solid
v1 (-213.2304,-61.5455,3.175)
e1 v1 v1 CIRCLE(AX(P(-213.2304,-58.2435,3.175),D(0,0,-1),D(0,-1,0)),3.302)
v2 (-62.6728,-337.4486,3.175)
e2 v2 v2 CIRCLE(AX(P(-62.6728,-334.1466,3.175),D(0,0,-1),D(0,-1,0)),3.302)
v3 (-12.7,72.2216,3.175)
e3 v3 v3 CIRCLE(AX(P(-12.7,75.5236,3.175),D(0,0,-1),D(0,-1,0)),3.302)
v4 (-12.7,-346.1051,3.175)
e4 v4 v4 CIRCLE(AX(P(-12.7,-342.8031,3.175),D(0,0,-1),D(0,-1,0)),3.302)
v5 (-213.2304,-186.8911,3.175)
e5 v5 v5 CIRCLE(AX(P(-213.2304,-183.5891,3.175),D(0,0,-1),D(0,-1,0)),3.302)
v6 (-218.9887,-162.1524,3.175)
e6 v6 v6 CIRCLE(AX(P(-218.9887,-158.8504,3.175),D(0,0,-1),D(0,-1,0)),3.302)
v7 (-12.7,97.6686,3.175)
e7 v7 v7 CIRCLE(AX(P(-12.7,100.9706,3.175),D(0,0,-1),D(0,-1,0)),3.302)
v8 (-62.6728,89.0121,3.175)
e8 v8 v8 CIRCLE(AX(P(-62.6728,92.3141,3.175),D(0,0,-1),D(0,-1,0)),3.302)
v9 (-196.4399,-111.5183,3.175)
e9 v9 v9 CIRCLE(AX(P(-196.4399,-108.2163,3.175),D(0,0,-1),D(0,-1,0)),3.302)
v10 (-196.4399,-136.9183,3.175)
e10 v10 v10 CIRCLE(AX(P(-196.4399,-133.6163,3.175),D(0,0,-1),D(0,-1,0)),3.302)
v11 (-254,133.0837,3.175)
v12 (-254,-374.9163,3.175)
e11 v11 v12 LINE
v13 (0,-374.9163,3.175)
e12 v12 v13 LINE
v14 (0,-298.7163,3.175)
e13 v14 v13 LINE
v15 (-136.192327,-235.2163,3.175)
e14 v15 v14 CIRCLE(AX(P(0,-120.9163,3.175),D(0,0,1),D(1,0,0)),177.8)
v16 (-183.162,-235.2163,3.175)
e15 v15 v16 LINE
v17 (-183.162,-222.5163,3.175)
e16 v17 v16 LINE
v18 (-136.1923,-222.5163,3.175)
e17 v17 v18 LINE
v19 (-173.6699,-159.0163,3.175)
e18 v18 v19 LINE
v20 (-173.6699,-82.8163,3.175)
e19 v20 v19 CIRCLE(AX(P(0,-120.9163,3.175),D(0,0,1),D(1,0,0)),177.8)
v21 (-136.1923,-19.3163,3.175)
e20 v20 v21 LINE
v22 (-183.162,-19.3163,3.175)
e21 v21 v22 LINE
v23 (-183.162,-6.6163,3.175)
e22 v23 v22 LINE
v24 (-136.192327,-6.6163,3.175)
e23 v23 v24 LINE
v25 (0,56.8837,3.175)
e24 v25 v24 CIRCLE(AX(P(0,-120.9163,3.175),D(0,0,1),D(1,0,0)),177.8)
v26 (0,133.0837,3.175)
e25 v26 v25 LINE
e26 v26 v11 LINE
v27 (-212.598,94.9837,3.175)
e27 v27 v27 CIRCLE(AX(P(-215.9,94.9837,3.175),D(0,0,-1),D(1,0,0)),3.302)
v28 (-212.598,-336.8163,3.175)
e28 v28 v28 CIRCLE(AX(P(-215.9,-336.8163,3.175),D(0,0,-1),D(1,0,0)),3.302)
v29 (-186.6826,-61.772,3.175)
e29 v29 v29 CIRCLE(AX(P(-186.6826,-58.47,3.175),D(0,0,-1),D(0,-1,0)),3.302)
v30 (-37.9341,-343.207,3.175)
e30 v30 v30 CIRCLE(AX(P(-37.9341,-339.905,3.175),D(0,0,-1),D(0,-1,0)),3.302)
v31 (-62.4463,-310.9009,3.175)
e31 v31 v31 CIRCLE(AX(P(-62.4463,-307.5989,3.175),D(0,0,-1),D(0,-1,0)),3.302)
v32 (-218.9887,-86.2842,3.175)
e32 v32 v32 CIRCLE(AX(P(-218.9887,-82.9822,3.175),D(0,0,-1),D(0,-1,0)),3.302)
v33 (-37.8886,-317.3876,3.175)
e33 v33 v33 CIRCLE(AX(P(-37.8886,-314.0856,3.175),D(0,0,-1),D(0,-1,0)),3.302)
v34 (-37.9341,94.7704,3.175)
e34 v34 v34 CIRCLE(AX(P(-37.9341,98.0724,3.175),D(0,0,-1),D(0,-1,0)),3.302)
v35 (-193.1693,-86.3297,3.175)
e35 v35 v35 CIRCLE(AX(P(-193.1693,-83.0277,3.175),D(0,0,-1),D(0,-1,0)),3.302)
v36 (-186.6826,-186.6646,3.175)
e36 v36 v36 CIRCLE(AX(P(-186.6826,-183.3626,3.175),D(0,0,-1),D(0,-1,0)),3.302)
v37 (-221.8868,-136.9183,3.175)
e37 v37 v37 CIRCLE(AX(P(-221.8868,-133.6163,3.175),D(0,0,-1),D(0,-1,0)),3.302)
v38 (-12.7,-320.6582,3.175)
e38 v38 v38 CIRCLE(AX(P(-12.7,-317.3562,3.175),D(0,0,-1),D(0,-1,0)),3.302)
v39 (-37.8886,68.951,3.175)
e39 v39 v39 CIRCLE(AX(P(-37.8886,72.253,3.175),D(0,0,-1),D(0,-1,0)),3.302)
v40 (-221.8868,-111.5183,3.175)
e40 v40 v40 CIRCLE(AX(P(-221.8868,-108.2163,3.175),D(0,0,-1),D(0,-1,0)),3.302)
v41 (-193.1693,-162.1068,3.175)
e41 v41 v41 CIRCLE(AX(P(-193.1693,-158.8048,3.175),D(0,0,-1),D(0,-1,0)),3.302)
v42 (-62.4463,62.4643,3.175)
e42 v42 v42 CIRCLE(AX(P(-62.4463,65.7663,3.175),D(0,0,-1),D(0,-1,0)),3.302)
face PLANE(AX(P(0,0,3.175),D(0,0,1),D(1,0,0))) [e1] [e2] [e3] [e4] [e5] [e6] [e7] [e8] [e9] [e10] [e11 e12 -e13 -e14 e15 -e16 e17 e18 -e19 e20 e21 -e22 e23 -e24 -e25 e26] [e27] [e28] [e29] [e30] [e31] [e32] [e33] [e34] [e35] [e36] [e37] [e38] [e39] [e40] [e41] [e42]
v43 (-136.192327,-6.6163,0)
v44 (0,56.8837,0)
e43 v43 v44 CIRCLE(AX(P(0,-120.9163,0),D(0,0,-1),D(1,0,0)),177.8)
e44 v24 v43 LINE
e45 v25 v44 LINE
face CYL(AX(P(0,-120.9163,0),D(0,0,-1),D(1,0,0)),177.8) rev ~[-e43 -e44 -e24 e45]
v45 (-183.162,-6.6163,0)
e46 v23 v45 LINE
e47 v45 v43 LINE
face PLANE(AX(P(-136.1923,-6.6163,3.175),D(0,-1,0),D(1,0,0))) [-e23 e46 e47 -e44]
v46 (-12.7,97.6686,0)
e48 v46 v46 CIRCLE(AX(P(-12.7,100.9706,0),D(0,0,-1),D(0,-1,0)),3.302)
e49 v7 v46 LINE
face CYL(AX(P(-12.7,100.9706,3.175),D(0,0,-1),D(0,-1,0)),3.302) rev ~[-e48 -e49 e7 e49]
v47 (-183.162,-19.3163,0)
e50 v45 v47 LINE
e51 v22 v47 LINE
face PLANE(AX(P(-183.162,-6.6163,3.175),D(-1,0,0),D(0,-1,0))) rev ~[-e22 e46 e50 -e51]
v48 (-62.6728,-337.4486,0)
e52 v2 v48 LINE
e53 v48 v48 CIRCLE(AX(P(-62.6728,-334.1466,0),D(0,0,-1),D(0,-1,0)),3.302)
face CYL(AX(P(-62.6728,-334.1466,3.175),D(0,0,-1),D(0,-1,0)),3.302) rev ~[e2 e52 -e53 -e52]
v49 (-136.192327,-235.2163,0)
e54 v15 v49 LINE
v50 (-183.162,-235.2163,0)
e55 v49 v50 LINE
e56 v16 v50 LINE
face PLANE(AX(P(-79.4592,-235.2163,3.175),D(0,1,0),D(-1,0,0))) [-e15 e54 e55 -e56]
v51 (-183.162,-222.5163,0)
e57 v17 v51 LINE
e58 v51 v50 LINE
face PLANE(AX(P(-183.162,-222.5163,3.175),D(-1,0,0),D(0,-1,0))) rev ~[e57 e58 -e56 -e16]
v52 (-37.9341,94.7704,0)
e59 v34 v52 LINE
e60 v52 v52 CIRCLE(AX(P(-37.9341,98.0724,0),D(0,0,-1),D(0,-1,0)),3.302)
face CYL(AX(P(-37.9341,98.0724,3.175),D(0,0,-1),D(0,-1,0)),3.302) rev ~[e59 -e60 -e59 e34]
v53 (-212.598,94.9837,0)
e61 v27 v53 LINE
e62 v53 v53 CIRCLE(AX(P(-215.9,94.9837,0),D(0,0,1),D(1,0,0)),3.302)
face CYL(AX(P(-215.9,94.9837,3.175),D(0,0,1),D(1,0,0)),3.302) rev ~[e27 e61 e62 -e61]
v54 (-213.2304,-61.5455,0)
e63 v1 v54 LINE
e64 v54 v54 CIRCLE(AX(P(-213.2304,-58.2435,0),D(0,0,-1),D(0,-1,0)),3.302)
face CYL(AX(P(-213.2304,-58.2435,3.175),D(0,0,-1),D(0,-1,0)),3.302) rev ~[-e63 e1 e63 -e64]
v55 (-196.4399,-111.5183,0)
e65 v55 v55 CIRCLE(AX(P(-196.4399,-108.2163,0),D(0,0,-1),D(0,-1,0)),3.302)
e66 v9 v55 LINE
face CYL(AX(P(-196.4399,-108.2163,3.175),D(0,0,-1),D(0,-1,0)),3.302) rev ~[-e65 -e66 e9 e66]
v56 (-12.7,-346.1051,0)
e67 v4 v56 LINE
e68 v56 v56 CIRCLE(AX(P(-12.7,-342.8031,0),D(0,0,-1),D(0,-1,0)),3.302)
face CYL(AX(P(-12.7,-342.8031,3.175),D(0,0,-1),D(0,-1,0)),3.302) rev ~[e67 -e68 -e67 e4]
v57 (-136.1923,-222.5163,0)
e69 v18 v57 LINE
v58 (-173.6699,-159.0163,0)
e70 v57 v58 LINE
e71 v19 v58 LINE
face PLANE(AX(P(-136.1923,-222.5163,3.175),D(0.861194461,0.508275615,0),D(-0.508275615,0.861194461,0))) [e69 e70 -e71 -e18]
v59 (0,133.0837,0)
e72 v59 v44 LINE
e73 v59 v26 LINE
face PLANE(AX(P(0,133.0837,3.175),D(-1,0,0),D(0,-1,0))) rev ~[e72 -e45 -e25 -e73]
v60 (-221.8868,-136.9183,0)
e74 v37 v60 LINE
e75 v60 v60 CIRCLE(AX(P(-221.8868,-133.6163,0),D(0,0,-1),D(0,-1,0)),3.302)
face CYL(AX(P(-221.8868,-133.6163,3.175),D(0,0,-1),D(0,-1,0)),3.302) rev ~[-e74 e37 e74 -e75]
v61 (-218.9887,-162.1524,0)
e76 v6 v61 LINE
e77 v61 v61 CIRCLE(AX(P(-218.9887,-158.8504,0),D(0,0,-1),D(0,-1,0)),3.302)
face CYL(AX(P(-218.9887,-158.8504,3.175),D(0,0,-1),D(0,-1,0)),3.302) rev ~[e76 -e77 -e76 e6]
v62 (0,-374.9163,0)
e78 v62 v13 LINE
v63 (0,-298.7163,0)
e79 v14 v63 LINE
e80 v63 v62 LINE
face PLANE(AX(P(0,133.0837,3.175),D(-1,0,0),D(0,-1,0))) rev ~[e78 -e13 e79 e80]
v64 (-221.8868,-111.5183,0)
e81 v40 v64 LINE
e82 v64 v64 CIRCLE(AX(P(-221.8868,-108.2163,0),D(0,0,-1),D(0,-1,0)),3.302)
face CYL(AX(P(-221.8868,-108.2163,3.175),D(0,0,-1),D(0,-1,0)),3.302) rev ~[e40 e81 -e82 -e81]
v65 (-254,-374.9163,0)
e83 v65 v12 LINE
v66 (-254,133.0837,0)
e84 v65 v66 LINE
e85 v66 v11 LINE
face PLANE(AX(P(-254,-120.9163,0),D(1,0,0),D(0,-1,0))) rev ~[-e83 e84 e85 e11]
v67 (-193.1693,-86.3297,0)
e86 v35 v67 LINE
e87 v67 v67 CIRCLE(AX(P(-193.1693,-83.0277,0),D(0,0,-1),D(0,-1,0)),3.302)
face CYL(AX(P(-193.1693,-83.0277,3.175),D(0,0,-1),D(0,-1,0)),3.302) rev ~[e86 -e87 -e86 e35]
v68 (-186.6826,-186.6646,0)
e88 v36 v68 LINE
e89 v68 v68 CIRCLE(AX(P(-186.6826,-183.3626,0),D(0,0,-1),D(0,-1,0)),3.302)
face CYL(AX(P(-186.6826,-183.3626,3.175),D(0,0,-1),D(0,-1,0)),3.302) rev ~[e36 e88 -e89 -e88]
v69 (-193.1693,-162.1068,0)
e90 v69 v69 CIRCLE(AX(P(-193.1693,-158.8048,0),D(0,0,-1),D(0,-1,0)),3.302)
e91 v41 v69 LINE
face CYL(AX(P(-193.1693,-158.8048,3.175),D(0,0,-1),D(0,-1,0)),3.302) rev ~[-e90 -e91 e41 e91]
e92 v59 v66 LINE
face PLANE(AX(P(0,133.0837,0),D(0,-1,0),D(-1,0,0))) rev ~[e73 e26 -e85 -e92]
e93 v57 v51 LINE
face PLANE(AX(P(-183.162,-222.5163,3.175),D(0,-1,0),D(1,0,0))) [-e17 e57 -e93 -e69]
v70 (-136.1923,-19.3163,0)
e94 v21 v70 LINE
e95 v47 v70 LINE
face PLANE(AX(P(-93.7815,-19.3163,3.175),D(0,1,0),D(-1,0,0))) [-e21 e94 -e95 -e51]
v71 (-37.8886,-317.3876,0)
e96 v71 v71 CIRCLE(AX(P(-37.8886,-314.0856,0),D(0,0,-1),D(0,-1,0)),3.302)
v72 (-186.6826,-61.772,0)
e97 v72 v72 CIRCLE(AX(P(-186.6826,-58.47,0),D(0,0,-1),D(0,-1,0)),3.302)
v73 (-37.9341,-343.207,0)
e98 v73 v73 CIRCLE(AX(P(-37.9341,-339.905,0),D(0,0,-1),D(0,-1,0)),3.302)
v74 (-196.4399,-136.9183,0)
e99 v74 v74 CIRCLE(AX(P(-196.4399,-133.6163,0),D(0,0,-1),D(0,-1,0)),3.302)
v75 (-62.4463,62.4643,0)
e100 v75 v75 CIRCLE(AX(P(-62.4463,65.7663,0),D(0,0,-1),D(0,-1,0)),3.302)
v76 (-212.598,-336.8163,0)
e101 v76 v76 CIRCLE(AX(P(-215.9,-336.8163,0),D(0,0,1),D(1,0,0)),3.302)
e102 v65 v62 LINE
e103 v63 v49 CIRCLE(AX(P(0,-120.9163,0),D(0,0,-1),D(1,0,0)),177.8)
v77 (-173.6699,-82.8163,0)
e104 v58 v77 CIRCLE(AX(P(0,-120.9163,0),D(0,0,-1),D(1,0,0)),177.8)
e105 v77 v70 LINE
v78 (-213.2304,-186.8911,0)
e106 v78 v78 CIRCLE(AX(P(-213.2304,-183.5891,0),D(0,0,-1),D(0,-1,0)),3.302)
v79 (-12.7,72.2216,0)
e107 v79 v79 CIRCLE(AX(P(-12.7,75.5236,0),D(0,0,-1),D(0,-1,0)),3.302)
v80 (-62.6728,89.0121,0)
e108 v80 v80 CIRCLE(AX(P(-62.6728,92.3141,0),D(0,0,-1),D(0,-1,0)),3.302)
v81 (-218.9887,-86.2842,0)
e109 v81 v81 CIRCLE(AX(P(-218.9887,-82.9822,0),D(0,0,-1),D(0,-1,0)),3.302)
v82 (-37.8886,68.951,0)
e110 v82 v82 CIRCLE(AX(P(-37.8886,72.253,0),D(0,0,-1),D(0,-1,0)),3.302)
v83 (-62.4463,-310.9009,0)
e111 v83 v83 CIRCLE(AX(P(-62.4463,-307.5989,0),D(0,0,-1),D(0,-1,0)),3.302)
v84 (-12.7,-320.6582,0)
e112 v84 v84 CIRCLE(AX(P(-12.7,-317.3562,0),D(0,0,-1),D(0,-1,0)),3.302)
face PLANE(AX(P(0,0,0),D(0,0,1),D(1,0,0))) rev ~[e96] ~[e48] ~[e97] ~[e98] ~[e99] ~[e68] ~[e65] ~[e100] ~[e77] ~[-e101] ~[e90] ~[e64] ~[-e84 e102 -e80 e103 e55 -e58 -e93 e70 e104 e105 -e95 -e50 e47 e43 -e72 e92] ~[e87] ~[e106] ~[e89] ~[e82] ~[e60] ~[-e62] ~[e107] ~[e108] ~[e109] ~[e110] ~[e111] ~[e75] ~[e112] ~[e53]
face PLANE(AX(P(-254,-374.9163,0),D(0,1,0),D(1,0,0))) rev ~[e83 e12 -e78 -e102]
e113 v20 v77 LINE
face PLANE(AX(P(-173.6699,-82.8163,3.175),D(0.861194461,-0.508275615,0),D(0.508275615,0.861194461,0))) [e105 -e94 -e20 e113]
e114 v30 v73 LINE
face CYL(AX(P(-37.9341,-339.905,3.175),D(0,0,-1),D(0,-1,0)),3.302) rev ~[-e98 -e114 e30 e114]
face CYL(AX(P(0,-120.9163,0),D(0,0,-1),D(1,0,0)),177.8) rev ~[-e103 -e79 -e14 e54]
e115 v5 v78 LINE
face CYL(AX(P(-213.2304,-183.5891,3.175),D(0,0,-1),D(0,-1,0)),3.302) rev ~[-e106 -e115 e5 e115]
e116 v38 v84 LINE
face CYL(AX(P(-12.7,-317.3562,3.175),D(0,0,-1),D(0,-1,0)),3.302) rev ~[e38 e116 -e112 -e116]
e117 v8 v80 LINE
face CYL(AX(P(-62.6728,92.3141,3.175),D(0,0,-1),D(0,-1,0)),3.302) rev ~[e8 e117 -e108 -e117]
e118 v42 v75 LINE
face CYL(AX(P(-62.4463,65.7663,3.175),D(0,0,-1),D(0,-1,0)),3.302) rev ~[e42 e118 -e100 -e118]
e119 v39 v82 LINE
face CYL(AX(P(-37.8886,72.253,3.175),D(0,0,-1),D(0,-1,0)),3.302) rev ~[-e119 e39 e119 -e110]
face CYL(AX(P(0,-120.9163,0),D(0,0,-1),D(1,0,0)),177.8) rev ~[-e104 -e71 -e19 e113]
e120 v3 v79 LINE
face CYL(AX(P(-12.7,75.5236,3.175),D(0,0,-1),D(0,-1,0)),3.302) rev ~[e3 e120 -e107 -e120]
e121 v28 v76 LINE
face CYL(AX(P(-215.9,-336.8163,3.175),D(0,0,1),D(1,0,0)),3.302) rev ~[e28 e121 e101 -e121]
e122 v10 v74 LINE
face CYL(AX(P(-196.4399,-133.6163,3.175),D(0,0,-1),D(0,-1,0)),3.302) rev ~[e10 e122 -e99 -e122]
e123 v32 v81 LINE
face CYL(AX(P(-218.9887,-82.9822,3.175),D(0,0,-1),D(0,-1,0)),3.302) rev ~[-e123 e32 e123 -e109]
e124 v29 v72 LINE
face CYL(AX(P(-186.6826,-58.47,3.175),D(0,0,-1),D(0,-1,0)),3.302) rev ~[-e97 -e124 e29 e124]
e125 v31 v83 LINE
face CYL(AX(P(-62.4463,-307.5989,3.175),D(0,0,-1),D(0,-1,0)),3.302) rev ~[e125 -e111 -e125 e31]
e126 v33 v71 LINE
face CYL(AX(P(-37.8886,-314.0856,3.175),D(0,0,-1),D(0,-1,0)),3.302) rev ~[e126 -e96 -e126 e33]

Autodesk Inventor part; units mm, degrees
ref_plane "YZ Plane" through (0, 0, 0) normal (1, 0, 0) x (0, 1, 0)
ref_plane "XZ Plane" through (0, 0, 0) normal (0, 1, 0) x (-1, 0, 0)
ref_plane "XY Plane" through (0, 0, 0) normal (0, 0, 1) x (1, 0, 0)
sketch "Sketch1" plane through (0, 0, 0) normal (0, 0, 1) x (1, 0, 0)
  circle A0 centre (62.4463, 65.7663) radius 3.175 projected
  circle A1 centre (37.8886, 72.253) radius 3.175 projected
  circle A2 centre (12.7, 75.5236) radius 3.175 projected
  circle A3 centre (12.7, 100.9706) radius 3.175 projected
  circle A4 centre (37.9341, 98.0724) radius 3.175 projected
  circle A5 centre (62.6728, 92.3141) radius 3.175 projected
  circle A6 centre (-62.6728, 92.3141) radius 3.175 projected
  circle A7 centre (-37.9341, 98.0724) radius 3.175 projected
  circle A8 centre (-12.7, 100.9706) radius 3.175 projected
  circle A9 centre (-12.7, 75.5236) radius 3.175 projected
  circle A10 centre (-37.8886, 72.253) radius 3.175 projected
  circle A11 centre (-62.4463, 65.7663) radius 3.175 projected
  circle A12 centre (-196.4399, -108.2163) radius 3.175 projected
  circle A13 centre (-193.1693, -83.0277) radius 3.175 projected
  circle A14 centre (-186.6826, -58.47) radius 3.175 projected
  circle A15 centre (-213.2304, -58.2435) radius 3.175 projected
  circle A16 centre (-218.9887, -82.9822) radius 3.175 projected
  circle A17 centre (-221.8868, -108.2163) radius 3.175 projected
  circle A18 centre (196.4399, -108.2163) radius 3.175 projected
  circle A19 centre (193.1693, -83.0277) radius 3.175 projected
  circle A20 centre (186.6826, -58.47) radius 3.175 projected
  circle A21 centre (213.2304, -58.2435) radius 3.175 projected
  circle A22 centre (218.9887, -82.9822) radius 3.175 projected
  circle A23 centre (221.8868, -108.2163) radius 3.175 projected
  arc A24 (241.3, -120.9163) -> (-241.3, -120.9163) centre (0, -120.9163) ccw projected
  line L0 (-241.3, -120.9163) -> (-177.8, -120.9163) projected
  arc A25 (177.8, -120.9163) -> (-177.8, -120.9163) centre (0, -120.9163) ccw projected
  line L1 (177.8, -120.9163) -> (241.3, -120.9163) projected
  circle A26 centre (-62.4463, -307.5989) radius 3.175 projected
  circle A27 centre (-37.8886, -314.0856) radius 3.175 projected
  circle A28 centre (-12.7, -317.3562) radius 3.175 projected
  circle A29 centre (-12.7, -342.8031) radius 3.175 projected
  circle A30 centre (-37.9341, -339.905) radius 3.175 projected
  circle A31 centre (-62.6728, -334.1466) radius 3.175 projected
  circle A32 centre (62.6728, -334.1466) radius 3.175 projected
  circle A33 centre (37.9341, -339.905) radius 3.175 projected
  circle A34 centre (12.7, -342.8031) radius 3.175 projected
  circle A35 centre (12.7, -317.3562) radius 3.175 projected
  circle A36 centre (37.8886, -314.0856) radius 3.175 projected
  circle A37 centre (62.4463, -307.5989) radius 3.175 projected
  circle A38 centre (196.4399, -133.6163) radius 3.175 projected
  circle A39 centre (193.1693, -158.8048) radius 3.175 projected
  circle A40 centre (186.6826, -183.3626) radius 3.175 projected
  circle A41 centre (213.2304, -183.5891) radius 3.175 projected
  circle A42 centre (218.9887, -158.8504) radius 3.175 projected
  circle A43 centre (221.8868, -133.6163) radius 3.175 projected
  circle A44 centre (-196.4399, -133.6163) radius 3.175 projected
  circle A45 centre (-193.1693, -158.8048) radius 3.175 projected
  circle A46 centre (-186.6826, -183.3626) radius 3.175 projected
  circle A47 centre (-213.2304, -183.5891) radius 3.175 projected
  circle A48 centre (-218.9887, -158.8504) radius 3.175 projected
  circle A49 centre (-221.8868, -133.6163) radius 3.175 projected
  arc A50 (-241.3, -120.9163) -> (241.3, -120.9163) centre (0, -120.9163) ccw projected
  line L2 (241.3, -120.9163) -> (177.8, -120.9163) projected
  arc A51 (-177.8, -120.9163) -> (177.8, -120.9163) centre (0, -120.9163) ccw projected
  line L3 (-177.8, -120.9163) -> (-241.3, -120.9163) projected
  circle A52 centre (0, -120.9163) radius 254
  line L4 (-254, -120.9163) -> (-254, 133.0837)
  line L5 (0, 133.0837) -> (-254, 133.0837)
  line L6 (-254, 100.9706) -> (-254, 104.1456)
  line L7 (-254, 56.8837) -> (-254, 60.0587)
  line L8 (0, -120.9163) -> (-254, 133.0837)
  line L9 (-179.6051, 58.6888) -> (-254, 133.0837)
  circle A53 centre (-216.8026, 95.8863) radius 3.302
  circle A54 centre (259.6856, -120.9163) radius 3.302
  arc A55 (271.0214, -121.5373) -> (259.974, -104.2042) centre (252.2597, -121.3082) ccw
  arc A56 (252.5671, -93.9743) -> (259.974, -104.2042) centre (265.1954, -92.6272) ccw
  line L10 (252.5671, -93.9743) -> (247.0534, -93.9743)
  line L11 (247.0534, -93.9743) -> (247.0534, -120.9163)
  arc A57 (257.0711, -139.4439) -> (271.0214, -121.5373) centre (252.2597, -121.3082) ccw
  arc A58 (257.0711, -139.4439) -> (252.5671, -147.8582) centre (265.1954, -149.2053) ccw
  line L12 (252.5671, -147.8582) -> (247.0534, -147.8582)
  line L13 (247.0534, -147.8582) -> (247.0534, -120.9163)
  line L14 (-254, -120.9163) -> (-254, -374.9163)
  line L15 (-254, -374.9163) -> (0, -374.9163)
  point P0 (0, 0)
  dimension "d0" = 508
  dimension "d3" = 6.604
  dimension "d7" = 6.604
  dimension "d8" = 12.7
extrude "Extrusion1" add sketch "Sketch1" along normal blind 3.175 contours L1 A25 L8 A24 | A50 L0 A51 L1 | L8 A25 L0 A24 | A52 L12 L13 L11 L10 | A52 A56 A55 A57 A58 | L10 L11 L13 L12 A52 | A52 L8 A53 L5 | L15 L14 A52 | A52 L4 L8 A53 | A53 L8 | L8 A53
sketch "Sketch2" plane through (0, 0, 3.175) normal (0, 0, 1) x (1, 0, 0)
  circle A0 centre (259.6856, -120.9163) radius 3.302 projected
  arc A1 (252.5671, -93.9743) -> (0, 133.0837) centre (0, -120.9163) ccw projected
  line L0 (0, 133.0837) -> (-254, 133.0837) projected
  line L1 (-254, 133.0837) -> (-254, -374.9163) projected
  line L2 (-254, -374.9163) -> (0, -374.9163) projected
  arc A2 (0, -374.9163) -> (252.5671, -147.8582) centre (0, -120.9163) ccw projected
  arc A3 (257.0711, -139.4439) -> (252.5671, -147.8582) centre (265.1954, -149.2053) ccw projected
  arc A4 (257.0711, -139.4439) -> (259.974, -104.2042) centre (252.2597, -121.3082) ccw projected
  arc A5 (252.5671, -93.9743) -> (259.974, -104.2042) centre (265.1954, -92.6272) ccw projected
  circle A6 centre (-62.4463, -307.5989) radius 3.175 projected
  circle A7 centre (-37.8886, -314.0856) radius 3.175 projected
  circle A8 centre (-12.7, -317.3562) radius 3.175 projected
  circle A9 centre (-12.7, -342.8031) radius 3.175 projected
  circle A10 centre (-37.9341, -339.905) radius 3.175 projected
  circle A11 centre (-62.6728, -334.1466) radius 3.175 projected
  circle A12 centre (62.6728, -334.1466) radius 3.175 projected
  circle A13 centre (37.9341, -339.905) radius 3.175 projected
  circle A14 centre (12.7, -342.8031) radius 3.175 projected
  circle A15 centre (12.7, -317.3562) radius 3.175 projected
  circle A16 centre (37.8886, -314.0856) radius 3.175 projected
  circle A17 centre (62.4463, -307.5989) radius 3.175 projected
  circle A18 centre (196.4399, -133.6163) radius 3.175 projected
  circle A19 centre (193.1693, -158.8048) radius 3.175 projected
  circle A20 centre (186.6826, -183.3626) radius 3.175 projected
  circle A21 centre (213.2304, -183.5891) radius 3.175 projected
  circle A22 centre (218.9887, -158.8504) radius 3.175 projected
  circle A23 centre (221.8868, -133.6163) radius 3.175 projected
  circle A24 centre (-196.4399, -133.6163) radius 3.175 projected
  circle A25 centre (-193.1693, -158.8048) radius 3.175 projected
  circle A26 centre (-186.6826, -183.3626) radius 3.175 projected
  circle A27 centre (-213.2304, -183.5891) radius 3.175 projected
  circle A28 centre (-218.9887, -158.8504) radius 3.175 projected
  circle A29 centre (-221.8868, -133.6163) radius 3.175 projected
  circle A30 centre (221.8868, -108.2163) radius 3.175 projected
  circle A31 centre (218.9887, -82.9822) radius 3.175 projected
  circle A32 centre (213.2304, -58.2435) radius 3.175 projected
  circle A33 centre (186.6826, -58.47) radius 3.175 projected
  circle A34 centre (193.1693, -83.0277) radius 3.175 projected
  circle A35 centre (196.4399, -108.2163) radius 3.175 projected
  circle A36 centre (-221.8868, -108.2163) radius 3.175 projected
  circle A37 centre (-218.9887, -82.9822) radius 3.175 projected
  circle A38 centre (-213.2304, -58.2435) radius 3.175 projected
  circle A39 centre (-186.6826, -58.47) radius 3.175 projected
  circle A40 centre (-193.1693, -83.0277) radius 3.175 projected
  circle A41 centre (-196.4399, -108.2163) radius 3.175 projected
  circle A42 centre (-62.4463, 65.7663) radius 3.175 projected
  circle A43 centre (-37.8886, 72.253) radius 3.175 projected
  circle A44 centre (-12.7, 75.5236) radius 3.175 projected
  circle A45 centre (-12.7, 100.9706) radius 3.175 projected
  circle A46 centre (-37.9341, 98.0724) radius 3.175 projected
  circle A47 centre (-62.6728, 92.3141) radius 3.175 projected
  circle A48 centre (62.6728, 92.3141) radius 3.175 projected
  circle A49 centre (37.9341, 98.0724) radius 3.175 projected
  circle A50 centre (12.7, 100.9706) radius 3.175 projected
  circle A51 centre (12.7, 75.5236) radius 3.175 projected
  circle A52 centre (37.8886, 72.253) radius 3.175 projected
  circle A53 centre (62.4463, 65.7663) radius 3.175 projected
  circle A54 centre (0, -120.9163) radius 177.8 projected
  line L3 (0, -120.9163) -> (346.8832, -120.9163)
  line L4 (346.8832, -120.9163) -> (346.8832, 148.9285)
  line L5 (346.8832, 148.9285) -> (0, 148.9285)
  line L6 (0, 148.9285) -> (0, -120.9163)
  line L7 (0, -120.9163) -> (432.9103, -120.9163)
  line L8 (432.9103, -120.9163) -> (432.9103, -436.6104)
  line L9 (432.9103, -436.6104) -> (0, -436.6104)
  line L10 (0, -436.6104) -> (0, -120.9163)
  point P0 (0, 0)
extrude "Extrusion2" cut sketch "Sketch2" against normal blind 25.4 contours L3 A0 | L3 A4 A3 A2 L10 A54 A0 | A0 L3 | A0 L3 A54 L6 A1 A5 A4 | L3 L7 L8 L9 L10 A2 A3 A4 | A4 A5 A1 L6 L5 L4 L3 | L3 L6 A54 | A54 L10 L3
sketch "Sketch3" plane through (0, 0, 3.175) normal (0, 0, 1) x (1, 0, 0)
  circle A0 centre (-62.6728, 92.3141) radius 3.175 projected
  circle A1 centre (-37.9341, 98.0724) radius 3.175 projected
  circle A2 centre (-12.7, 100.9706) radius 3.175 projected
  circle A3 centre (-12.7, 75.5236) radius 3.175 projected
  circle A4 centre (-37.8886, 72.253) radius 3.175 projected
  circle A5 centre (-62.4463, 65.7663) radius 3.175 projected
  circle A6 centre (-196.4399, -108.2163) radius 3.175 projected
  circle A7 centre (-193.1693, -83.0277) radius 3.175 projected
  circle A8 centre (-186.6826, -58.47) radius 3.175 projected
  circle A9 centre (-213.2304, -58.2435) radius 3.175 projected
  circle A10 centre (-218.9887, -82.9822) radius 3.175 projected
  circle A11 centre (-221.8868, -108.2163) radius 3.175 projected
  circle A12 centre (-221.8868, -133.6163) radius 3.175 projected
  circle A13 centre (-218.9887, -158.8504) radius 3.175 projected
  circle A14 centre (-213.2304, -183.5891) radius 3.175 projected
  circle A15 centre (-186.6826, -183.3626) radius 3.175 projected
  circle A16 centre (-193.1693, -158.8048) radius 3.175 projected
  circle A17 centre (-196.4399, -133.6163) radius 3.175 projected
  circle A18 centre (-62.6728, -334.1466) radius 3.175 projected
  circle A19 centre (-37.9341, -339.905) radius 3.175 projected
  circle A20 centre (-12.7, -342.8031) radius 3.175 projected
  circle A21 centre (-12.7, -317.3562) radius 3.175 projected
  circle A22 centre (-37.8886, -314.0856) radius 3.175 projected
  circle A23 centre (-62.4463, -307.5989) radius 3.175 projected
  line L0 (0, -374.9163) -> (0, -298.7163) projected
  arc A24 (0, 56.8837) -> (0, -298.7163) centre (0, -120.9163) ccw projected
  line L1 (0, 56.8837) -> (0, 133.0837) projected
  line L2 (0, 133.0837) -> (-254, 133.0837) projected
  line L3 (-254, 133.0837) -> (-254, -374.9163) projected
  line L4 (-254, -374.9163) -> (0, -374.9163) projected
  circle A25 centre (-12.7, 100.9706) radius 3.175 projected
  circle A26 centre (-37.9341, 98.0724) radius 3.175 projected
  point P0 (0, 0)
hole "Hole1" at (-12.7, 100.9706, 3.175) at (-12.7, 75.5236, 3.175) at (-37.8886, 72.253, 3.175) at (-37.9341, 98.0724, 3.175) at (-62.6728, 92.3141, 3.175) at (-62.4463, 65.7663, 3.175) at (-186.6826, -58.47, 3.175) at (-213.2304, -58.2435, 3.175) at (-193.1693, -83.0277, 3.175) at (-218.9887, -82.9822, 3.175) at (-196.4399, -108.2163, 3.175) at (-221.8868, -108.2163, 3.175) at (-196.4399, -133.6163, 3.175) at (-221.8868, -133.6163, 3.175) at (-193.1693, -158.8048, 3.175) at (-218.9887, -158.8504, 3.175) at (-213.2304, -183.5891, 3.175) at (-186.6826, -183.3626, 3.175) at (-62.4463, -307.5989, 3.175) at (-62.6728, -334.1466, 3.175) at (-37.9341, -339.905, 3.175) at (-37.8886, -314.0856, 3.175) at (-12.7, -317.3562, 3.175) at (-12.7, -342.8031, 3.175) direction (0, 0, -1) diameter 6.604 end through all
sketch "Sketch4" plane through (0, 0, 3.175) normal (0, 0, 1) x (1, 0, 0)
  circle A0 centre (-12.7, -317.3562) radius 3.302 projected
  circle A1 centre (-37.9341, -339.905) radius 3.302 projected
  circle A2 centre (-62.4463, -307.5989) radius 3.302 projected
  circle A3 centre (-213.2304, -183.5891) radius 3.302 projected
  circle A4 centre (-193.1693, -158.8048) radius 3.302 projected
  circle A5 centre (-196.4399, -133.6163) radius 3.302 projected
  circle A6 centre (-196.4399, -108.2163) radius 3.302 projected
  circle A7 centre (-193.1693, -83.0277) radius 3.302 projected
  circle A8 centre (-186.6826, -58.47) radius 3.302 projected
  circle A9 centre (-62.6728, 92.3141) radius 3.302 projected
  circle A10 centre (-37.8886, 72.253) radius 3.302 projected
  circle A11 centre (-12.7, 100.9706) radius 3.302 projected
  circle A12 centre (-12.7, 75.5236) radius 3.302 projected
  circle A13 centre (-37.9341, 98.0724) radius 3.302 projected
  circle A14 centre (-62.4463, 65.7663) radius 3.302 projected
  circle A15 centre (-213.2304, -58.2435) radius 3.302 projected
  circle A16 centre (-218.9887, -82.9822) radius 3.302 projected
  circle A17 centre (-221.8868, -108.2163) radius 3.302 projected
  circle A18 centre (-221.8868, -133.6163) radius 3.302 projected
  circle A19 centre (-218.9887, -158.8504) radius 3.302 projected
  circle A20 centre (-186.6826, -183.3626) radius 3.302 projected
  circle A21 centre (-62.6728, -334.1466) radius 3.302 projected
  circle A22 centre (-37.8886, -314.0856) radius 3.302 projected
  circle A23 centre (-12.7, -342.8031) radius 3.302 projected
  line L0 (0, -374.9163) -> (0, -298.7163) projected
  arc A24 (0, 56.8837) -> (0, -298.7163) centre (0, -120.9163) ccw projected
  line L1 (0, 56.8837) -> (0, 133.0837) projected
  line L2 (0, 133.0837) -> (-254, 133.0837) projected
  line L3 (-254, 133.0837) -> (-254, -374.9163) projected
  line L4 (-254, -374.9163) -> (0, -374.9163) projected
  line L5 (-254, 133.0837) -> (0, -120.9163)
  line L6 (-254, 133.0837) -> (-254, -374.9163) projected
  line L7 (0, -120.9163) -> (-254, -374.9163)
  circle A25 centre (-215.9, 94.9837) radius 3.302
  circle A26 centre (-215.9, -336.8163) radius 3.302
  point P0 (0, 0)
  dimension "d20" = 6.604
  dimension "d21" = 6.604
  dimension "d22" = 38.1
  dimension "d23" = 38.1
extrude "Extrusion3" cut sketch "Sketch4" against normal blind 25.4 contours A26 L7 | L7 A26 | A25 L5 | L5 A25
sketch "Sketch5" plane through (0, 0, 3.175) normal (0, 0, 1) x (1, 0, 0)
  line L0 (0, 0) -> (0, -62.5604)
  line L1 (183.162, -19.3163) -> (145.9119, -19.3163) projected
  arc A0 (145.9119, -222.5163) -> (145.9119, -19.3163) centre (0, -120.9163) ccw projected
  line L2 (145.9119, -222.5163) -> (183.162, -222.5163) projected
  line L3 (183.162, -222.5163) -> (183.162, -235.2163) projected
  line L4 (183.162, -235.2163) -> (136.1923, -235.2163) projected
  arc A1 (0, -298.7163) -> (136.1923, -235.2163) centre (0, -120.9163) ccw projected
  line L5 (0, -298.7163) -> (0, -374.9163) projected
  arc A2 (0, -374.9163) -> (249.0244, -170.945) centre (0, -120.9163) ccw projected
  arc A3 (256.4729, -157.4946) -> (249.0244, -170.945) centre (273.9268, -175.9478) ccw projected
  arc A4 (256.4729, -157.4946) -> (256.4729, -84.338) centre (221.8757, -120.9163) ccw projected
  arc A5 (249.0244, -70.8876) -> (256.4729, -84.338) centre (273.9268, -65.8847) ccw projected
  arc A6 (249.0244, -70.8876) -> (0, 133.0837) centre (0, -120.9163) ccw projected
  line L6 (0, 133.0837) -> (0, 56.8837) projected
  arc A7 (136.1923, -6.6163) -> (0, 56.8837) centre (0, -120.9163) ccw projected
  line L7 (136.1923, -6.6163) -> (183.162, -6.6163) projected
  line L8 (183.162, -6.6163) -> (183.162, -19.3163) projected
  circle A8 centre (12.7, 75.5236) radius 3.302 projected
  circle A9 centre (37.9341, 98.0724) radius 3.302 projected
  circle A10 centre (62.4463, 65.7663) radius 3.302 projected
  circle A11 centre (186.6826, -58.47) radius 3.302 projected
  circle A12 centre (218.9887, -82.9822) radius 3.302 projected
  circle A13 centre (196.4399, -108.2163) radius 3.302 projected
  circle A14 centre (221.8868, -133.6163) radius 3.302 projected
  circle A15 centre (193.1693, -158.8048) radius 3.302 projected
  circle A16 centre (213.2304, -183.5891) radius 3.302 projected
  circle A17 centre (12.7, -317.3562) radius 3.302 projected
  circle A18 centre (37.8886, -314.0856) radius 3.302 projected
  circle A19 centre (62.4463, -307.5989) radius 3.302 projected
  circle A20 centre (62.6728, -334.1466) radius 3.302 projected
  circle A21 centre (37.9341, -339.905) radius 3.302 projected
  circle A22 centre (12.7, -342.8031) radius 3.302 projected
  circle A23 centre (186.6826, -183.3626) radius 3.302 projected
  circle A24 centre (218.9887, -158.8504) radius 3.302 projected
  circle A25 centre (196.4399, -133.6163) radius 3.302 projected
  circle A26 centre (221.8868, -108.2163) radius 3.302 projected
  circle A27 centre (193.1693, -83.0277) radius 3.302 projected
  circle A28 centre (213.2304, -58.2435) radius 3.302 projected
  circle A29 centre (62.6728, 92.3141) radius 3.302 projected
  circle A30 centre (37.8886, 72.253) radius 3.302 projected
  circle A31 centre (12.7, 100.9706) radius 3.302 projected
  circle A32 centre (259.6856, -120.9163) radius 3.302 projected
  line L9 (183.162, -6.6163) -> (93.7815, -6.6163)
  line L10 (93.7815, -6.6163) -> (93.7815, -19.3163)
  line L11 (93.7815, -19.3163) -> (183.162, -19.3163)
  line L12 (183.162, -19.3163) -> (183.162, -6.6163)
  line L13 (183.162, -222.5163) -> (79.4592, -222.5163)
  line L14 (79.4592, -222.5163) -> (79.4592, -235.2163)
  line L15 (79.4592, -235.2163) -> (183.162, -235.2163)
  line L16 (183.162, -235.2163) -> (183.162, -222.5163)
  line L17 (-183.162, -222.5163) -> (-183.162, -235.2163)
  line L18 (-136.1923, -6.6163) -> (-183.162, -6.6163)
  line L19 (-183.162, -6.6163) -> (-183.162, -19.3163)
  line L20 (-93.7815, -6.6163) -> (-93.7815, -19.3163)
  line L21 (-93.7815, -19.3163) -> (-183.162, -19.3163)
  line L22 (-183.162, -222.5163) -> (-79.4592, -222.5163)
  line L23 (-79.4592, -222.5163) -> (-79.4592, -235.2163)
  line L24 (-79.4592, -235.2163) -> (-183.162, -235.2163)
  line L25 (-183.162, -6.6163) -> (-93.7815, -6.6163)
  line L26 (-93.7815, -6.6163) -> (-93.7815, -19.3163)
  line L27 (-93.7815, -19.3163) -> (-183.162, -19.3163)
  line L28 (-183.162, -19.3163) -> (-183.162, -6.6163)
  line L29 (-183.162, -222.5163) -> (-79.4592, -222.5163)
  line L30 (-79.4592, -222.5163) -> (-79.4592, -235.2163)
  line L31 (-79.4592, -235.2163) -> (-183.162, -235.2163)
  line L32 (-183.162, -235.2163) -> (-183.162, -222.5163)
extrude "Extrusion4" cut sketch "Sketch5" against normal blind 25.4 contours L22 L23 L24 L17 | L25 L20 L21 L19 L18
sketch "Sketch6" plane through (0, 0, 3.175) normal (0, 0, 1) x (1, 0, 0)
  line L0 (-145.9119, -19.3163) -> (-183.162, -19.3163) projected
  line L1 (-183.162, -19.3163) -> (-183.162, -6.6163) projected
  line L2 (-183.162, -6.6163) -> (-136.1923, -6.6163) projected
  arc A0 (0, 56.8837) -> (-136.1923, -6.6163) centre (0, -120.9163) ccw projected
  line L3 (0, 56.8837) -> (0, 133.0837) projected
  line L4 (0, 133.0837) -> (-254, 133.0837) projected
  line L5 (-254, 133.0837) -> (-254, -374.9163) projected
  line L6 (-254, -374.9163) -> (0, -374.9163) projected
  line L7 (0, -374.9163) -> (0, -298.7163) projected
  arc A1 (-136.1923, -235.2163) -> (0, -298.7163) centre (0, -120.9163) ccw projected
  line L8 (-136.1923, -235.2163) -> (-183.162, -235.2163) projected
  line L9 (-183.162, -235.2163) -> (-183.162, -222.5163) projected
  line L10 (-183.162, -222.5163) -> (-145.9119, -222.5163) projected
  arc A2 (-145.9119, -19.3163) -> (-145.9119, -222.5163) centre (0, -120.9163) ccw projected
  circle A3 centre (-12.7, -342.8031) radius 3.302 projected
  circle A4 centre (-37.8886, -314.0856) radius 3.302 projected
  circle A5 centre (-62.6728, -334.1466) radius 3.302 projected
  circle A6 centre (-186.6826, -183.3626) radius 3.302 projected
  circle A7 centre (-218.9887, -158.8504) radius 3.302 projected
  circle A8 centre (-221.8868, -133.6163) radius 3.302 projected
  circle A9 centre (-221.8868, -108.2163) radius 3.302 projected
  circle A10 centre (-218.9887, -82.9822) radius 3.302 projected
  circle A11 centre (-213.2304, -58.2435) radius 3.302 projected
  circle A12 centre (-62.4463, 65.7663) radius 3.302 projected
  circle A13 centre (-37.9341, 98.0724) radius 3.302 projected
  circle A14 centre (-12.7, 75.5236) radius 3.302 projected
  circle A15 centre (-12.7, 100.9706) radius 3.302 projected
  circle A16 centre (-37.8886, 72.253) radius 3.302 projected
  circle A17 centre (-62.6728, 92.3141) radius 3.302 projected
  circle A18 centre (-186.6826, -58.47) radius 3.302 projected
  circle A19 centre (-193.1693, -83.0277) radius 3.302 projected
  circle A20 centre (-196.4399, -108.2163) radius 3.302 projected
  circle A21 centre (-196.4399, -133.6163) radius 3.302 projected
  circle A22 centre (-193.1693, -158.8048) radius 3.302 projected
  circle A23 centre (-213.2304, -183.5891) radius 3.302 projected
  circle A24 centre (-62.4463, -307.5989) radius 3.302 projected
  circle A25 centre (-37.9341, -339.905) radius 3.302 projected
  circle A26 centre (-12.7, -317.3562) radius 3.302 projected
  circle A27 centre (-215.9, 94.9837) radius 3.302 projected
  circle A28 centre (-215.9, -336.8163) radius 3.302 projected
  line L11 (183.162, -19.3163) -> (136.1923, -19.3163) projected
  line L12 (136.1923, -19.3163) -> (173.6699, -82.8163) projected
  arc A29 (177.8, -120.9163) -> (173.6699, -82.8163) centre (0, -120.9163) ccw projected
  line L13 (177.8, -120.9163) -> (241.3, -120.9163) projected
  arc A30 (241.3, -120.9163) -> (-241.3, -120.9163) centre (0, -120.9163) ccw projected
  line L14 (-241.3, -120.9163) -> (-177.8, -120.9163) projected
  arc A31 (-173.6699, -82.8163) -> (-177.8, -120.9163) centre (0, -120.9163) ccw projected
  line L15 (-173.6699, -82.8163) -> (-136.1923, -19.3163) projected
  line L16 (-136.1923, -19.3163) -> (-183.162, -19.3163) projected
  line L17 (-183.162, -19.3163) -> (-183.162, -6.6163) projected
  line L18 (-183.162, -6.6163) -> (-136.1923, -6.6163) projected
  arc A32 (136.1923, -6.6163) -> (-136.1923, -6.6163) centre (0, -120.9163) ccw projected
  line L19 (136.1923, -6.6163) -> (183.162, -6.6163) projected
  line L20 (183.162, -6.6163) -> (183.162, -19.3163) projected
  circle A33 centre (62.4463, 65.7663) radius 3.175 projected
  circle A34 centre (37.8886, 72.253) radius 3.175 projected
  circle A35 centre (12.7, 75.5236) radius 3.175 projected
  circle A36 centre (12.7, 100.9706) radius 3.175 projected
  circle A37 centre (37.9341, 98.0724) radius 3.175 projected
  circle A38 centre (62.6728, 92.3141) radius 3.175 projected
  circle A39 centre (-62.6728, 92.3141) radius 3.175 projected
  circle A40 centre (-37.9341, 98.0724) radius 3.175 projected
  circle A41 centre (-12.7, 100.9706) radius 3.175 projected
  circle A42 centre (-12.7, 75.5236) radius 3.175 projected
  circle A43 centre (-37.8886, 72.253) radius 3.175 projected
  circle A44 centre (-62.4463, 65.7663) radius 3.175 projected
  circle A45 centre (-196.4399, -108.2163) radius 3.175 projected
  circle A46 centre (-193.1693, -83.0277) radius 3.175 projected
  circle A47 centre (-186.6826, -58.47) radius 3.175 projected
  circle A48 centre (-213.2304, -58.2435) radius 3.175 projected
  circle A49 centre (-218.9887, -82.9822) radius 3.175 projected
  circle A50 centre (-221.8868, -108.2163) radius 3.175 projected
  circle A51 centre (196.4399, -108.2163) radius 3.175 projected
  circle A52 centre (193.1693, -83.0277) radius 3.175 projected
  circle A53 centre (186.6826, -58.47) radius 3.175 projected
  circle A54 centre (213.2304, -58.2435) radius 3.175 projected
  circle A55 centre (218.9887, -82.9822) radius 3.175 projected
  circle A56 centre (221.8868, -108.2163) radius 3.175 projected
  line L21 (-183.162, -222.5163) -> (-136.1923, -222.5163) projected
  line L22 (-136.1923, -222.5163) -> (-173.6699, -159.0163) projected
  arc A57 (-177.8, -120.9163) -> (-173.6699, -159.0163) centre (0, -120.9163) ccw projected
  line L23 (-177.8, -120.9163) -> (-241.3, -120.9163) projected
  arc A58 (-241.3, -120.9163) -> (241.3, -120.9163) centre (0, -120.9163) ccw projected
  line L24 (241.3, -120.9163) -> (177.8, -120.9163) projected
  arc A59 (173.6699, -159.0163) -> (177.8, -120.9163) centre (0, -120.9163) ccw projected
  line L25 (173.6699, -159.0163) -> (136.1923, -222.5163) projected
  line L26 (136.1923, -222.5163) -> (183.162, -222.5163) projected
  line L27 (183.162, -222.5163) -> (183.162, -235.2163) projected
  line L28 (183.162, -235.2163) -> (136.1923, -235.2163) projected
  arc A60 (-136.1923, -235.2163) -> (136.1923, -235.2163) centre (0, -120.9163) ccw projected
  line L29 (-136.1923, -235.2163) -> (-183.162, -235.2163) projected
  line L30 (-183.162, -235.2163) -> (-183.162, -222.5163) projected
  circle A61 centre (-62.4463, -307.5989) radius 3.175 projected
  circle A62 centre (-37.8886, -314.0856) radius 3.175 projected
  circle A63 centre (-12.7, -317.3562) radius 3.175 projected
  circle A64 centre (-12.7, -342.8031) radius 3.175 projected
  circle A65 centre (-37.9341, -339.905) radius 3.175 projected
  circle A66 centre (-62.6728, -334.1466) radius 3.175 projected
  circle A67 centre (62.6728, -334.1466) radius 3.175 projected
  circle A68 centre (37.9341, -339.905) radius 3.175 projected
  circle A69 centre (12.7, -342.8031) radius 3.175 projected
  circle A70 centre (12.7, -317.3562) radius 3.175 projected
  circle A71 centre (37.8886, -314.0856) radius 3.175 projected
  circle A72 centre (62.4463, -307.5989) radius 3.175 projected
  circle A73 centre (196.4399, -133.6163) radius 3.175 projected
  circle A74 centre (193.1693, -158.8048) radius 3.175 projected
  circle A75 centre (186.6826, -183.3626) radius 3.175 projected
  circle A76 centre (213.2304, -183.5891) radius 3.175 projected
  circle A77 centre (218.9887, -158.8504) radius 3.175 projected
  circle A78 centre (221.8868, -133.6163) radius 3.175 projected
  circle A79 centre (-196.4399, -133.6163) radius 3.175 projected
  circle A80 centre (-193.1693, -158.8048) radius 3.175 projected
  circle A81 centre (-186.6826, -183.3626) radius 3.175 projected
  circle A82 centre (-213.2304, -183.5891) radius 3.175 projected
  circle A83 centre (-218.9887, -158.8504) radius 3.175 projected
  circle A84 centre (-221.8868, -133.6163) radius 3.175 projected
  arc A85 (-145.9119, -19.3163) -> (-145.9119, -222.5163) centre (0, -120.9163) ccw projected
  arc A86 (-173.6699, -159.0163) -> (-145.9119, -19.3163) centre (0, -120.9163) ccw
  line L31 (-173.6699, -159.0163) -> (-136.1923, -222.5163)
  line L32 (-183.162, -222.5163) -> (-145.9119, -222.5163) projected
  line L33 (-136.1923, -222.5163) -> (-145.9119, -222.5163)
  point P0 (0, 0)
extrude "Extrusion5" add sketch "Sketch6" against normal blind 3.175 contours L16 L15 A2 | L22 L21 A2
properties part number "19in outer coil BOTTOM" material "Copper, Alloy"
